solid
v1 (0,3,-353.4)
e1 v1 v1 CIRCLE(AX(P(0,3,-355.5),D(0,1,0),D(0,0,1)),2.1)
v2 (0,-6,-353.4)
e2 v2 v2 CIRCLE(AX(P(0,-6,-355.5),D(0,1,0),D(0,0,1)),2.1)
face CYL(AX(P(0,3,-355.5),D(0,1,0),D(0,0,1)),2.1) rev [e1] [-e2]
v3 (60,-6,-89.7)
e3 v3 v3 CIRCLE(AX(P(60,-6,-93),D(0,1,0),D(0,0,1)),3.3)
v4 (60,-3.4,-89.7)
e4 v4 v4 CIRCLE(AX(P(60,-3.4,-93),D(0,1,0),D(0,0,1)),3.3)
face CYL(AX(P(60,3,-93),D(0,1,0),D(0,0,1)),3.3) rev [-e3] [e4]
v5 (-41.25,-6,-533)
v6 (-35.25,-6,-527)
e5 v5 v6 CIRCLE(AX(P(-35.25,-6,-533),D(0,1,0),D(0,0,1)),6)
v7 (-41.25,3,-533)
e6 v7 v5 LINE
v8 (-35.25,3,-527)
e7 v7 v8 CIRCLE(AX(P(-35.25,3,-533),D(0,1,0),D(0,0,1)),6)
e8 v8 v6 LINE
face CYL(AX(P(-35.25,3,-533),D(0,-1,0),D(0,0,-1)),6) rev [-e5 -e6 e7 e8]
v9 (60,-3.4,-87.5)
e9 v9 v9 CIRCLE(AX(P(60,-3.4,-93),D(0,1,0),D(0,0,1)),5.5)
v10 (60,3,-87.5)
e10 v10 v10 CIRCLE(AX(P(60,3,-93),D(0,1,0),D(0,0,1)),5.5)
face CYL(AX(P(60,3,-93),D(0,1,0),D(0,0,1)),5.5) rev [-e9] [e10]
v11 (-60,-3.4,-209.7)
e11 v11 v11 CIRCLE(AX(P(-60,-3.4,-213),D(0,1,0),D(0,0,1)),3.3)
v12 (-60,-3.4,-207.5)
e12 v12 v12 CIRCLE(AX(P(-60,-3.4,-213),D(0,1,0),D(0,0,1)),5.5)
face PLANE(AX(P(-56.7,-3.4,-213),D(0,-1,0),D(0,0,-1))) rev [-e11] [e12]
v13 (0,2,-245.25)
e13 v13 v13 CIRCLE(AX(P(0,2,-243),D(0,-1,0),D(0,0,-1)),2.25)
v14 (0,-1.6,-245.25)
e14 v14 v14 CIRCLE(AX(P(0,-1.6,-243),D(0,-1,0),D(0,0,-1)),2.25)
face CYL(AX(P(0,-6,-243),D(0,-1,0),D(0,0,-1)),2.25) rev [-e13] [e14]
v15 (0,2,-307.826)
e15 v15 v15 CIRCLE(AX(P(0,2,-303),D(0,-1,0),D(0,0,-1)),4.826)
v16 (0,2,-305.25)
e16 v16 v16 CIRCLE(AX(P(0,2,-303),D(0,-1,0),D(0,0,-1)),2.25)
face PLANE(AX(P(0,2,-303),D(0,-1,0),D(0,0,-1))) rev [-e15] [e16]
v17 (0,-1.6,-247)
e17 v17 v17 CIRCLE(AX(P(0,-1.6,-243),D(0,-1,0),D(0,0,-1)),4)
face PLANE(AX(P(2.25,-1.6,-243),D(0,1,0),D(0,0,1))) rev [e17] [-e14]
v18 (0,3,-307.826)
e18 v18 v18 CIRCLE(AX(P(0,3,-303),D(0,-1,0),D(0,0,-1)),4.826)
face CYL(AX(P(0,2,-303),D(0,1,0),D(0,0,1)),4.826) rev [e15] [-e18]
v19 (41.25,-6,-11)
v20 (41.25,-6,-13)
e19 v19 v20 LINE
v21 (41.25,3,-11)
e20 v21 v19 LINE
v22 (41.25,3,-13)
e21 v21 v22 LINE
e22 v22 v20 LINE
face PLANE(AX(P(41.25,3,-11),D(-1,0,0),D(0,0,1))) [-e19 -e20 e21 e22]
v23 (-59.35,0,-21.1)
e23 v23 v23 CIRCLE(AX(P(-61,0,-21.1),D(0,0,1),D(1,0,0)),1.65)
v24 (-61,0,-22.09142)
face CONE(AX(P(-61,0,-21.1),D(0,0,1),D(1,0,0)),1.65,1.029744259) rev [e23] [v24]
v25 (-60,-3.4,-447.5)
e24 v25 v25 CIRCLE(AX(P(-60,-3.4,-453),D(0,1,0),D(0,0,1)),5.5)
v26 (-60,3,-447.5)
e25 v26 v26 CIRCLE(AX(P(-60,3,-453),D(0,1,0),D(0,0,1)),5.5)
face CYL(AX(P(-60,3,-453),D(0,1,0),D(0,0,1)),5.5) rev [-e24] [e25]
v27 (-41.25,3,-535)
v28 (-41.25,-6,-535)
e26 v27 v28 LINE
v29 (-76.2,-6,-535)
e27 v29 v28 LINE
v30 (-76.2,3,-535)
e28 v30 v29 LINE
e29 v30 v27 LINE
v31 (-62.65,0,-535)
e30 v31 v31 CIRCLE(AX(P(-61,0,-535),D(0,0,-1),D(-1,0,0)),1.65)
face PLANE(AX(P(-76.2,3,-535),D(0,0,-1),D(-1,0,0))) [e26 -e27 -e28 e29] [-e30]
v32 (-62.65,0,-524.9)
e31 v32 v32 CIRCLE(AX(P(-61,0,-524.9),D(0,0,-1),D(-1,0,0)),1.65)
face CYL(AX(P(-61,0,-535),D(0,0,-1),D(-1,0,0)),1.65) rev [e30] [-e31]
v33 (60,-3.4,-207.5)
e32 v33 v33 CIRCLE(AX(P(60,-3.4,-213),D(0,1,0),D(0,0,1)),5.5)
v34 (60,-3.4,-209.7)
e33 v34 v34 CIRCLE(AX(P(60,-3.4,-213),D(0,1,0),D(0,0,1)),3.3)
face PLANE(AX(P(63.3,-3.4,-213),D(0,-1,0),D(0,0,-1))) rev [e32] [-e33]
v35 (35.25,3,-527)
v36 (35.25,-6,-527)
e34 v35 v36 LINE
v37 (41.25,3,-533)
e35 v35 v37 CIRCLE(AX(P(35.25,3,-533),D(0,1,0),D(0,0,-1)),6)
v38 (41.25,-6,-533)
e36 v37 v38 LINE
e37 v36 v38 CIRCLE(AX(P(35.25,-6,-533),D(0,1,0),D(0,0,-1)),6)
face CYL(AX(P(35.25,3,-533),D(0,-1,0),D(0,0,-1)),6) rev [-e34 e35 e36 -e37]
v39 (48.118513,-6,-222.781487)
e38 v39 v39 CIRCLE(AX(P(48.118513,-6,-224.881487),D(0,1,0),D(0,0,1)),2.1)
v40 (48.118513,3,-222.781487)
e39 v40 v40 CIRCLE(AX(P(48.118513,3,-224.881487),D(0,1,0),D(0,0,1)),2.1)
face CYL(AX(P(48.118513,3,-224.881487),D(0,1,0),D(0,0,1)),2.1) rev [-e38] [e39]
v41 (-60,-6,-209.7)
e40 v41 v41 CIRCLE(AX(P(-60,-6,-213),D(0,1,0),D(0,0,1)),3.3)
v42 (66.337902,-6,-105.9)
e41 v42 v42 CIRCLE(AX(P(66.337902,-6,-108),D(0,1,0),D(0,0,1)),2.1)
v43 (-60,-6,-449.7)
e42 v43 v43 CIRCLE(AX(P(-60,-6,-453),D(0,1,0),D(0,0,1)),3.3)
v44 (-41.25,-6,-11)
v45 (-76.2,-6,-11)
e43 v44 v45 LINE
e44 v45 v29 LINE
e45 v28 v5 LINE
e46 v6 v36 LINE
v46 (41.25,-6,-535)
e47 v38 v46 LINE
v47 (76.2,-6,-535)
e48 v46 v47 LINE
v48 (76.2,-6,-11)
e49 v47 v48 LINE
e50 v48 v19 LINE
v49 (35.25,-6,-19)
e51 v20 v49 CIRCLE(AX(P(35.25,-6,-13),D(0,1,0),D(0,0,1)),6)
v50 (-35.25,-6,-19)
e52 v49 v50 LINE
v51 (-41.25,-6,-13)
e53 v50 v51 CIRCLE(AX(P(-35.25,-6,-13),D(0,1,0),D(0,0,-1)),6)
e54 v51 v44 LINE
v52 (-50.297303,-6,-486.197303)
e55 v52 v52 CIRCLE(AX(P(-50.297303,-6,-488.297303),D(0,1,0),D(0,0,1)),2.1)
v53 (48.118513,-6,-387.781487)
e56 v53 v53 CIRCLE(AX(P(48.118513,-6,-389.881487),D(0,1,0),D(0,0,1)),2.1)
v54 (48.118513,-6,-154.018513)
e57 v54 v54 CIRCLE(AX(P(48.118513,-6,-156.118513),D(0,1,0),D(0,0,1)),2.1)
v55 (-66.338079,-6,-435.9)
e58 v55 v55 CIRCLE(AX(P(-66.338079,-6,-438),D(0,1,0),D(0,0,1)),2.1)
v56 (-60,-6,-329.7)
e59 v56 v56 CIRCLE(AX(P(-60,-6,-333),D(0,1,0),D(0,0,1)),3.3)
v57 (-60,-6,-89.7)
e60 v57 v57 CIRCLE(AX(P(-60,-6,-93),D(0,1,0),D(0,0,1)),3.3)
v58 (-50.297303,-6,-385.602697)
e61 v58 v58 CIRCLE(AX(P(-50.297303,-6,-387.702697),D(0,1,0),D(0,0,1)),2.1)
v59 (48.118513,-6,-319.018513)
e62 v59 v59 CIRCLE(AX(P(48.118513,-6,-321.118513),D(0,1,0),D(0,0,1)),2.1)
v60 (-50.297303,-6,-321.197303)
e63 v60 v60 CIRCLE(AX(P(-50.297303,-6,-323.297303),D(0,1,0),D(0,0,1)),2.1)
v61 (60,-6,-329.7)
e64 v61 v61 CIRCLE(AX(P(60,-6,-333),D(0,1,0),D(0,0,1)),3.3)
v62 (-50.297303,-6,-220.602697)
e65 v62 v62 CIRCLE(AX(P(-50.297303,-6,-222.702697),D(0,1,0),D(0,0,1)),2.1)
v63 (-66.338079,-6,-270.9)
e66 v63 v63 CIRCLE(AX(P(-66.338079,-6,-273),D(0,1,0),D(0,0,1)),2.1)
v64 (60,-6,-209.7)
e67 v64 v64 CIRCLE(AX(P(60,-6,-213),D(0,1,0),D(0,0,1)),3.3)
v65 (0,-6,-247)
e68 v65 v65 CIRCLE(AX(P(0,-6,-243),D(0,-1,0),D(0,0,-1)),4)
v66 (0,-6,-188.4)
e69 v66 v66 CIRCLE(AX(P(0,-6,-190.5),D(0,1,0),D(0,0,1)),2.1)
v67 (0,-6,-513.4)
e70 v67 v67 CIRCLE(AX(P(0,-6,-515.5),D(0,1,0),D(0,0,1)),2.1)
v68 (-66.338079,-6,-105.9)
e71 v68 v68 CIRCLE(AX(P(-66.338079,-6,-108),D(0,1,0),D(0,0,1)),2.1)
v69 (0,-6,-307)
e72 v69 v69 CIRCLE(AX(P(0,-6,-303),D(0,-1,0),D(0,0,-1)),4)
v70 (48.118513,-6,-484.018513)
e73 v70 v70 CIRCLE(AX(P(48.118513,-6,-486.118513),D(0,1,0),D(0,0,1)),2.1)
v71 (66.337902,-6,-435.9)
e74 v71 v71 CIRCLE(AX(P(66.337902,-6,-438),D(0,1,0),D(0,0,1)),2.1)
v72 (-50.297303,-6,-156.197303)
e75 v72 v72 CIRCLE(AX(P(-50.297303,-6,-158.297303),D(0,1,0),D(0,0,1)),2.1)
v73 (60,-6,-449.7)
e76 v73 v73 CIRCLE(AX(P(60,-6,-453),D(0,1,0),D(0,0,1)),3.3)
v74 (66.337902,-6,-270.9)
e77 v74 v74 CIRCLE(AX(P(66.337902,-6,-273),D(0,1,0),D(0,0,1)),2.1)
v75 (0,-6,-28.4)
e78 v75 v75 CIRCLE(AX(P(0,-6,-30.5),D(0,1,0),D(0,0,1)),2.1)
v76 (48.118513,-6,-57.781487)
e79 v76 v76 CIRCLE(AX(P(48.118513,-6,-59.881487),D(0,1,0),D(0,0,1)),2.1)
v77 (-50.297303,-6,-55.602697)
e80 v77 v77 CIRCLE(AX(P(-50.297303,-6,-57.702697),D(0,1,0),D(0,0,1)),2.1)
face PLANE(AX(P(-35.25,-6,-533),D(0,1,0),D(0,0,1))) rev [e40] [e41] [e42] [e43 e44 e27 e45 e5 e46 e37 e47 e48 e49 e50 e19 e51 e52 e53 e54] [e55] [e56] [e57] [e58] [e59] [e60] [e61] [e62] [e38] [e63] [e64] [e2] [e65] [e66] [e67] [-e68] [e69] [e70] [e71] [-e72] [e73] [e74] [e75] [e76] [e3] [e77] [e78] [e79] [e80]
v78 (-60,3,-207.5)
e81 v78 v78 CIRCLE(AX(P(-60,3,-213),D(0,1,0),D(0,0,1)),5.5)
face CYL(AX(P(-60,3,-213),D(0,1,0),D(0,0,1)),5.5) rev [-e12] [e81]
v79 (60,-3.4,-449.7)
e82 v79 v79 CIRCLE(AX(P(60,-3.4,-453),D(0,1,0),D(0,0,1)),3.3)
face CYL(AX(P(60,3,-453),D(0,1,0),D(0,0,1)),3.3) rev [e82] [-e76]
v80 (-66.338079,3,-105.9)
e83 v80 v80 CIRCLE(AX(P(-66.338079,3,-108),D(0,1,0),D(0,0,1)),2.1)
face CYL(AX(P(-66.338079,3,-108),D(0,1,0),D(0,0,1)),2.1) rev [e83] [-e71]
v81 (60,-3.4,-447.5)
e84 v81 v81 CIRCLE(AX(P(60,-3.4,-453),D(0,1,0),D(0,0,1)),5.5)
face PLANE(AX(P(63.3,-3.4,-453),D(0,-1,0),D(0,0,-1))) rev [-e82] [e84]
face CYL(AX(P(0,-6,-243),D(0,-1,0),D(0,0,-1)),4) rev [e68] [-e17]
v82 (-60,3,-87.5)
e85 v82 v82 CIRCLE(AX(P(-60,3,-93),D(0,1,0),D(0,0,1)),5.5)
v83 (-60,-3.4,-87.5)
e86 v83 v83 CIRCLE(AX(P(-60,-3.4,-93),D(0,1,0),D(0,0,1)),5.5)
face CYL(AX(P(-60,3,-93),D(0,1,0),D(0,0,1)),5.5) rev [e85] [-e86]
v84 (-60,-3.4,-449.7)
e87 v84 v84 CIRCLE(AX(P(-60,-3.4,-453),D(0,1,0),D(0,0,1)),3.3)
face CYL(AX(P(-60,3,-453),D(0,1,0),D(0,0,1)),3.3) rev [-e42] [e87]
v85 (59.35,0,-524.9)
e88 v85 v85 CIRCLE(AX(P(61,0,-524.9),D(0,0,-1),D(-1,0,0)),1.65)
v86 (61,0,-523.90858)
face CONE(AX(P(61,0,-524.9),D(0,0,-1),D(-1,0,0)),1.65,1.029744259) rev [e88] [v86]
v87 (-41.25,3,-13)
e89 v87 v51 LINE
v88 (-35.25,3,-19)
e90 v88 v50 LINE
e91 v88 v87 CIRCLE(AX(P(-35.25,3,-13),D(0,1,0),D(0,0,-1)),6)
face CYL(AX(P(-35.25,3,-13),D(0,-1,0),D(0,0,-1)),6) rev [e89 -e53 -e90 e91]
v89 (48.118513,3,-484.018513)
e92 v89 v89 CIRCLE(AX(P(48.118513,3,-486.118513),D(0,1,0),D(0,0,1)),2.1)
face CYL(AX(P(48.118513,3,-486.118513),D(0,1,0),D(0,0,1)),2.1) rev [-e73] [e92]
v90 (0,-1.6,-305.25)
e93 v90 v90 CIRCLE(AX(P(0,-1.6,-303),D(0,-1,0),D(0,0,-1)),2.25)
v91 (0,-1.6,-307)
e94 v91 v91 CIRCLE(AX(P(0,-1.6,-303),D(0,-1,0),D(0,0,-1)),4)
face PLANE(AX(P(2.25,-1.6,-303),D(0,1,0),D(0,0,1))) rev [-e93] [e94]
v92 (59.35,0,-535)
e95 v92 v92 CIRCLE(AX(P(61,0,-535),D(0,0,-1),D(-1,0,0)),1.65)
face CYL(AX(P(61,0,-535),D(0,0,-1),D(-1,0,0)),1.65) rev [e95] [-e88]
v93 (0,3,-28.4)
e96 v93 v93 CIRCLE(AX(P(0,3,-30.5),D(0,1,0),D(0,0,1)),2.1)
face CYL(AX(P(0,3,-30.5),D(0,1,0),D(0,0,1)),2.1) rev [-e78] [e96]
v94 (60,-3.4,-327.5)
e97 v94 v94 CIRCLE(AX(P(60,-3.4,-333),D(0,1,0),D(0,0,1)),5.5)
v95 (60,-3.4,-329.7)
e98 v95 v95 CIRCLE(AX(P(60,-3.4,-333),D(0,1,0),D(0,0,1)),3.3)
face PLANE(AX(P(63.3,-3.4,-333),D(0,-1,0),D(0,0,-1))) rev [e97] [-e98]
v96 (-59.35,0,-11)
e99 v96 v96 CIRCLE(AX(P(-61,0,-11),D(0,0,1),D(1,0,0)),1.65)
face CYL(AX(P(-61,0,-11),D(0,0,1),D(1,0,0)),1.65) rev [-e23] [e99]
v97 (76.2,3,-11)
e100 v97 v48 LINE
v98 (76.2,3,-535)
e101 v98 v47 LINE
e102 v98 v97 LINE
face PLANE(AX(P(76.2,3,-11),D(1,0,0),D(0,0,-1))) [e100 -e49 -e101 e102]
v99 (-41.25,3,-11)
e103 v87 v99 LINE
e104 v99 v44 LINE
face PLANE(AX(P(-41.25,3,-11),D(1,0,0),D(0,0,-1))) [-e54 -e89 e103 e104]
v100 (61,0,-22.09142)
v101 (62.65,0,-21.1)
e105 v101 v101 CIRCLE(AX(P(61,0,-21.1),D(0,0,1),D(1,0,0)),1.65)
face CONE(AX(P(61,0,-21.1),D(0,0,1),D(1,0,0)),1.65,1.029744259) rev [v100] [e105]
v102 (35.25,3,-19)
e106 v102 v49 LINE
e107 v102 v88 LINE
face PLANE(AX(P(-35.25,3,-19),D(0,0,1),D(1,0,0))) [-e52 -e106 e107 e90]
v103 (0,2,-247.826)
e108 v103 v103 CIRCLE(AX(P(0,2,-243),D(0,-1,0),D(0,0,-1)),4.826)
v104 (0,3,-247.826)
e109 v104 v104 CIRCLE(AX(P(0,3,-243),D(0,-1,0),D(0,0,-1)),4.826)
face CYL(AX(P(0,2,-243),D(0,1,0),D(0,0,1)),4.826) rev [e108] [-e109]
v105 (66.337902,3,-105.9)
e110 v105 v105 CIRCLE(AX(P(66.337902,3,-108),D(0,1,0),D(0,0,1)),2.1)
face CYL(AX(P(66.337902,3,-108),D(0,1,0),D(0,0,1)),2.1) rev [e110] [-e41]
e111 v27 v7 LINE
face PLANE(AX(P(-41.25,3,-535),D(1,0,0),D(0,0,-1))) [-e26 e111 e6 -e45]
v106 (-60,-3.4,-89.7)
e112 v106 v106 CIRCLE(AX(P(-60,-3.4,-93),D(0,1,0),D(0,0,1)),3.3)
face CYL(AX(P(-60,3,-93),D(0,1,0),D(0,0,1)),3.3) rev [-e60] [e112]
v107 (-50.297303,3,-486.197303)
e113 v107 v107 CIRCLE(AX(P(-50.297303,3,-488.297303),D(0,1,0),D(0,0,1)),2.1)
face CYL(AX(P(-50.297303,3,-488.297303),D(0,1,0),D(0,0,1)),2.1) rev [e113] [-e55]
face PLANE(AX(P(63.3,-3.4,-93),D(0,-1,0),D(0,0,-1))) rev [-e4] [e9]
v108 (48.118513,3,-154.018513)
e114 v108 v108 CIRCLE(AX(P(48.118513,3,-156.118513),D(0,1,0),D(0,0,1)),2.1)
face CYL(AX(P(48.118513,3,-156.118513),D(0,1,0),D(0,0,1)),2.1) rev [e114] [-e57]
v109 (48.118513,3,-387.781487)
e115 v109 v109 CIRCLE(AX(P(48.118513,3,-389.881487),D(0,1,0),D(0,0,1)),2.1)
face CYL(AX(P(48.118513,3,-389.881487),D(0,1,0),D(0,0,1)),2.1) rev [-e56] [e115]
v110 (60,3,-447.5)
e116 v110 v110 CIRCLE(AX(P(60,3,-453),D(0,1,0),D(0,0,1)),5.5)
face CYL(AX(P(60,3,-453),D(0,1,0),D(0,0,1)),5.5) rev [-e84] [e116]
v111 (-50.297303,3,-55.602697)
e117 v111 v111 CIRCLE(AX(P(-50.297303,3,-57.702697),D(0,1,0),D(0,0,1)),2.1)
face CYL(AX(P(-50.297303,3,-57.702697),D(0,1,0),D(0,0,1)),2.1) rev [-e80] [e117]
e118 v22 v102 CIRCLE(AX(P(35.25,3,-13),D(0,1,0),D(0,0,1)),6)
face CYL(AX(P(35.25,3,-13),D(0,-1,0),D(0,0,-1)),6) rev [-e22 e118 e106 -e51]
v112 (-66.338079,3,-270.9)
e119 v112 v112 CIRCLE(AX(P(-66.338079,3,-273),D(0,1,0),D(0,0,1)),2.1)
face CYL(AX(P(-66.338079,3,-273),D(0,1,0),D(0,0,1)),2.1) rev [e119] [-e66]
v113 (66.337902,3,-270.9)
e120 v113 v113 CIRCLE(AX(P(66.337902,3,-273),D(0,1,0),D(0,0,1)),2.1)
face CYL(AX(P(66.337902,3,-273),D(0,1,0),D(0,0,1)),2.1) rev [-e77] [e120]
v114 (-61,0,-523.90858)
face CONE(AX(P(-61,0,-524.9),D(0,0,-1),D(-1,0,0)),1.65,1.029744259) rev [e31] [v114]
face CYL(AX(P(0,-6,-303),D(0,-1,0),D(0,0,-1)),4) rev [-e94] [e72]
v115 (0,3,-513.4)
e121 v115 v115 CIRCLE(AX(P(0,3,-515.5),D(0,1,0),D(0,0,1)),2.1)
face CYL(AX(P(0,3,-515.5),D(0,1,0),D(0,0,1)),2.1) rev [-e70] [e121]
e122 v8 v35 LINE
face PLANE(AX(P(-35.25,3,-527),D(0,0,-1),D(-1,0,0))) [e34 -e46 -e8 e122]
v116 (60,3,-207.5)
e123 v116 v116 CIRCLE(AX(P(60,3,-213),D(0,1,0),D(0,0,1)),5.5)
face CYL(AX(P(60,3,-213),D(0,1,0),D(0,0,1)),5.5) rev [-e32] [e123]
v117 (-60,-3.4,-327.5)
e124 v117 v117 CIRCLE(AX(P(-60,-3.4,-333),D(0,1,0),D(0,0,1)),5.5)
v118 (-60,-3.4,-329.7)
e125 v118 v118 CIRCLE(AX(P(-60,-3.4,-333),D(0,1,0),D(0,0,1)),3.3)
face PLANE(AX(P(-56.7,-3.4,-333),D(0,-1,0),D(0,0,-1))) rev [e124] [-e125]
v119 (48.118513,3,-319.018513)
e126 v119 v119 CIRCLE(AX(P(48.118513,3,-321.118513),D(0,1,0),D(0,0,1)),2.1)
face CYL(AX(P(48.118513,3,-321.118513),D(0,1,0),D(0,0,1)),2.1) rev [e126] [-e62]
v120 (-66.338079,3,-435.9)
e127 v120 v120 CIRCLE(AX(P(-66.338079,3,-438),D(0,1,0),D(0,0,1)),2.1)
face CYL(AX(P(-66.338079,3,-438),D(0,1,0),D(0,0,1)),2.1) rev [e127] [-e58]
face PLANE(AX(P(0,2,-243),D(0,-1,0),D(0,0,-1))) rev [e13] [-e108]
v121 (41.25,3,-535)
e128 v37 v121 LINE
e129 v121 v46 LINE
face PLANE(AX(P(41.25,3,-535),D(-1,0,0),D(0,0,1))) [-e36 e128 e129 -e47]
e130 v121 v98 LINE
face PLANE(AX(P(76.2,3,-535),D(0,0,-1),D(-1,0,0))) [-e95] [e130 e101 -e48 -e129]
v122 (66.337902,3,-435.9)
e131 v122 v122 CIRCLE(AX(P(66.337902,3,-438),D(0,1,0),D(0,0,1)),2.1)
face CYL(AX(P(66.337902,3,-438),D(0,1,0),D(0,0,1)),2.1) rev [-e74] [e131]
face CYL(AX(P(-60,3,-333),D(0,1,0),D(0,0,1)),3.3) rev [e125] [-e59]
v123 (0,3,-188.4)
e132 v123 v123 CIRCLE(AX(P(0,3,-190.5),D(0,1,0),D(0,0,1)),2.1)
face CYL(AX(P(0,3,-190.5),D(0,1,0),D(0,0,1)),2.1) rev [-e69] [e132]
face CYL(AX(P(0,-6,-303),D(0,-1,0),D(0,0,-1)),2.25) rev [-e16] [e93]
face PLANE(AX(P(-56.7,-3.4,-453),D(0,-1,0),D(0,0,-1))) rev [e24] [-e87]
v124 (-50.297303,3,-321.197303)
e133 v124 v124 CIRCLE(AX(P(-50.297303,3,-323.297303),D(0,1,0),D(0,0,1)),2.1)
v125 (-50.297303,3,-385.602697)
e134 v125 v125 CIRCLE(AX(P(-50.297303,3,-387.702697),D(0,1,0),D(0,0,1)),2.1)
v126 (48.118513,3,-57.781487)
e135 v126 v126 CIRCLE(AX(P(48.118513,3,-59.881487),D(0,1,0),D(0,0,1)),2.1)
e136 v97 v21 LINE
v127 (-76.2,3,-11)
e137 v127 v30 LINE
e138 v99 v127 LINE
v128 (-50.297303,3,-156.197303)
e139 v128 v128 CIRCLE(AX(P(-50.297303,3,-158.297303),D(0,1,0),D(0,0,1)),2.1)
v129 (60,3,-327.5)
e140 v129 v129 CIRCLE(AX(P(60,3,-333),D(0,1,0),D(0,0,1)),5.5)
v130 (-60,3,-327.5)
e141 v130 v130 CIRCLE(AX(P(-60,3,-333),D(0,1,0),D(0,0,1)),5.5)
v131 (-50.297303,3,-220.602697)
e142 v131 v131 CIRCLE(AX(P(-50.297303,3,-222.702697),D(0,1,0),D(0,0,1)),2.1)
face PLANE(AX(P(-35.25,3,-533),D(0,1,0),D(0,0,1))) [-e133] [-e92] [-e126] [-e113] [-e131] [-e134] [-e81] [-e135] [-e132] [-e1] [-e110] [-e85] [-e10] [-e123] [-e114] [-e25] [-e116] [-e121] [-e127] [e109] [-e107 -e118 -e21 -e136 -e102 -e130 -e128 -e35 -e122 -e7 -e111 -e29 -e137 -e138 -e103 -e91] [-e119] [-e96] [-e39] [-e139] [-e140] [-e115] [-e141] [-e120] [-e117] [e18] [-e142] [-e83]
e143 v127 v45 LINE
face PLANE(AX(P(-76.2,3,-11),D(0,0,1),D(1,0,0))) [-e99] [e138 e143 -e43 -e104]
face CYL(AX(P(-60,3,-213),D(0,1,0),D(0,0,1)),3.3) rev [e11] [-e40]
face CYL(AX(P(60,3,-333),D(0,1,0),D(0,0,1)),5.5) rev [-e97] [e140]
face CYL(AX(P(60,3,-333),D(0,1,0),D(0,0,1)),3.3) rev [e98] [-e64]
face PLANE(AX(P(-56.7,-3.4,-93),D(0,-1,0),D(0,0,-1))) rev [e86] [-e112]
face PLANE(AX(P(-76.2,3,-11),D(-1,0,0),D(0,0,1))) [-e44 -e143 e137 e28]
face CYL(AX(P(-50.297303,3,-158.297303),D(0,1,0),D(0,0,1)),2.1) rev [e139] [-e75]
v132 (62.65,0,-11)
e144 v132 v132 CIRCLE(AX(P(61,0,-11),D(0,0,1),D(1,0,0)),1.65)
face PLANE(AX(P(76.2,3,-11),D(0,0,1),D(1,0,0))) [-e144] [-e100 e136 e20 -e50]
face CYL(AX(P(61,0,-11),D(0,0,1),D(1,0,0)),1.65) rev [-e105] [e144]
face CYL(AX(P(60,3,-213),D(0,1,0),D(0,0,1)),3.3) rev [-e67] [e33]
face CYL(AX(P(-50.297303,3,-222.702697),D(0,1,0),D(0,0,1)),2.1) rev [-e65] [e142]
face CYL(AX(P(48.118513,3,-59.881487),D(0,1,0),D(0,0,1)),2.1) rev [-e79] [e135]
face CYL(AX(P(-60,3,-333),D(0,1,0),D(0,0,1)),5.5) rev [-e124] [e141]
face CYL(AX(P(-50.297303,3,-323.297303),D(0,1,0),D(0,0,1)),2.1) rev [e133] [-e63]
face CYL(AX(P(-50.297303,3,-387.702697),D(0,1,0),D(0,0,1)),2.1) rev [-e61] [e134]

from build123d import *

# Parameters (mm, degrees)
BOSS_EXTRUDE1_DEPTH                                 = 6
CBORE_FOR_M4_HEX_SOCKET_HEAD_CAP_SCREW1_D           = 4.5
CBORE_FOR_M4_HEX_SOCKET_HEAD_CAP_SCREW1_CBORE_D     = 8
CBORE_FOR_M4_HEX_SOCKET_HEAD_CAP_SCREW1_CBORE_DEPTH = 4.4
CBORE_START                                         = 7.6
CBORE_FOR_M4_HEX_SOCKET_HEAD_CAP_SCR_2_R            = 4
CBORE_FOR_M4_HEX_SOCKET_HEAD_CAP_SCREW2_DEPTH       = 4.4
CBORE_START_2                                       = 1
CBORE_FOR_M4_HEX_SOCKET_HEAD_CAP_SCR_3_O_R          = 2.25
CBORE_FOR_M4_HEX_SOCKET_HEAD_CAP_SCR_3_DEPTH        = 6.6
SKETCH15_W                                          = 81.5
SKETCH15_H                                          = 12
BOSS_EXTRUDE2_DEPTH                                 = 2
M4_TAPPED_HOLE1_D                                   = 3.3
CUT_EXTRUDE1_DEPTH                                  = 70.296464556
CUT_EXTRUDE3_DEPTH                                  = 70.296464574
FILLET1_R                                           = 4
SKETCH16_W                                          = 20
SKETCH16_H                                          = 12
BOSS_EXTRUDE3_DEPTH                                 = 2.75
FILLET2_R                                           = 3.5
M2_TAPPED_HOLE1_D                                   = 1.6
M2_TAPPED_HOLE1_DEPTH                               = 7.2
M2_TAPPED_HOLE1_TIP                                 = 0.480688495
M3_TAPPED_HOLE1_D                                   = 2.5
BOSS_EXTRUDE4_DEPTH                                 = 9
M4_TAPPED_HOLE2_AT_2_COUNT                          = 2
M4_TAPPED_HOLE2_AT_2_PITCH                          = 122
CBORE_FOR_M6_HEX_SOCKET_HEAD_CAP_SCREW1_D           = 6.6
CBORE_FOR_M6_HEX_SOCKET_HEAD_CAP_SCREW1_CBORE_D     = 11
CBORE_FOR_M6_HEX_SOCKET_HEAD_CAP_SCREW1_CBORE_DEPTH = 6.4
SKETCH44_R                                          = 4.826
CUT_EXTRUDE6_DEPTH                                  = 1
CBORE_FOR_M4_HEX_SOCKET_HEAD_CAP_SCREW3_D           = 4.5
CBORE_FOR_M4_HEX_SOCKET_HEAD_CAP_SCREW3_CBORE_D     = 8
CBORE_FOR_M4_HEX_SOCKET_HEAD_CAP_SCREW3_CBORE_DEPTH = 4.4
M5_TAPPED_HOLE1_D                                   = 4.2


# Read off the part's stored shape, not the designer's step: CBORE for M4 Hex Socket Head Cap Screw2
with BuildPart() as part:
    # Sketch2 → Boss-Extrude1 (new, symmetric)
    with BuildSketch(Plane(origin=(0, 0, 0), x_dir=(1, 0, 0), z_dir=(0, 1, 0))):
        with BuildLine():
            Line((67, 11), (67, -10.5))
            ThreePointArc((67, -10.5), (66.560660172, -11.560660172), (65.5, -12))
            Line((65.5, -12), (-65.5, -12))
            ThreePointArc((-65.5, -12), (-66.560660172, -11.560660172), (-67, -10.5))
            Line((-67, -10.5), (-67, 11))
            Line((-67, 11), (0, 11))
            Line((0, 11), (67, 11))
        make_face()
        with BuildLine():
            Line((42.806252715, 3.5), (35.85, 3.5))
            ThreePointArc((35.85, 3.5), (34.435786438, 4.085786438), (33.85, 5.5))
            Line((33.85, 5.5), (33.85, 8.25))
            ThreePointArc((33.85, 8.25), (33.190990258, 9.840990258), (31.6, 10.5))
            Line((31.6, 10.5), (19.6, 10.5))
            ThreePointArc((19.6, 10.5), (17.35, 8.25), (19.6, 6))
            Line((19.6, 6), (27.75, 6))
            ThreePointArc((27.75, 6), (29.164213562, 5.414213562), (29.75, 4))
            Line((29.75, 4), (29.75, 1.25))
            ThreePointArc((29.75, 1.25), (30.409009742, -0.340990258), (32, -1))
            Line((32, -1), (42.062746067, -1))
            ThreePointArc((42.062746067, -1), (57.892990527, -1.304109096), (42.806252715, 3.5))
        make_face(mode=Mode.SUBTRACT)
        with BuildLine():
            Line((-42.062746067, -1), (-32, -1))
            ThreePointArc((-32, -1), (-30.409009742, -0.340990258), (-29.75, 1.25))
            Line((-29.75, 1.25), (-29.75, 4))
            ThreePointArc((-29.75, 4), (-29.164213562, 5.414213562), (-27.75, 6))
            Line((-27.75, 6), (-19.6, 6))
            ThreePointArc((-19.6, 6), (-17.35, 8.25), (-19.6, 10.5))
            Line((-19.6, 10.5), (-31.6, 10.5))
            ThreePointArc((-31.6, 10.5), (-33.190990258, 9.840990258), (-33.85, 8.25))
            Line((-33.85, 8.25), (-33.85, 5.5))
            ThreePointArc((-33.85, 5.5), (-34.435786438, 4.085786438), (-35.85, 3.5))
            Line((-35.85, 3.5), (-42.806252715, 3.5))
            ThreePointArc((-42.806252715, 3.5), (-57.892990527, -1.304109096), (-42.062746067, -1))
        make_face(mode=Mode.SUBTRACT)
    extrude(amount=BOSS_EXTRUDE1_DEPTH, both=True)

    # CBORE for M4 Hex Socket Head Cap Screw1 (through all)
    with Locations(Plane.XY.offset(12)):
        with Locations((61, 0), (-61, 0)):
            CounterBoreHole(CBORE_FOR_M4_HEX_SOCKET_HEAD_CAP_SCREW1_D / 2, CBORE_FOR_M4_HEX_SOCKET_HEAD_CAP_SCREW1_CBORE_D / 2, CBORE_FOR_M4_HEX_SOCKET_HEAD_CAP_SCREW1_CBORE_DEPTH)

    # CBORE for M4 Hex Socket Head Cap Scr 2 → CBORE for M4 Hex Socket Head Cap Screw2 (cut)
    with BuildSketch(Plane.XY.offset(CBORE_START)):
        with Locations((-38, 0)):
            Circle(CBORE_FOR_M4_HEX_SOCKET_HEAD_CAP_SCR_2_R)
        with Locations((38, 0)):
            Circle(CBORE_FOR_M4_HEX_SOCKET_HEAD_CAP_SCR_2_R)
    extrude(amount=CBORE_FOR_M4_HEX_SOCKET_HEAD_CAP_SCREW2_DEPTH, mode=Mode.SUBTRACT)

    # CBORE for M4 Hex Socket Head Cap Scr 3 o → CBORE for M4 Hex Socket Head Cap Scr 3 (cut)
    with BuildSketch(Plane.XY.offset(CBORE_START_2)):
        with Locations((-38, 0)):
            Circle(CBORE_FOR_M4_HEX_SOCKET_HEAD_CAP_SCR_3_O_R)
        with Locations((38, 0)):
            Circle(CBORE_FOR_M4_HEX_SOCKET_HEAD_CAP_SCR_3_O_R)
    extrude(amount=CBORE_FOR_M4_HEX_SOCKET_HEAD_CAP_SCR_3_DEPTH, mode=Mode.SUBTRACT)

    # Sketch15 → Boss-Extrude2 (add)
    with BuildSketch(Plane(origin=(0, 0, -11), x_dir=(-1, 0, 0), z_dir=(0, 0, -1))):
        Rectangle(SKETCH15_W, SKETCH15_H)
    extrude(amount=BOSS_EXTRUDE2_DEPTH)

    # M4 Tapped Hole1 (through all)
    with Locations(Plane.XY.offset(12)):
        with Locations((38, 0), (-38, 0)):
            Hole(M4_TAPPED_HOLE1_D / 2)

    # Sketch12 → Cut-Revolve1 (revolve, cut)
    with BuildSketch(Plane.XY, mode=Mode.PRIVATE) as cut_revolve1_sk:
        Polygon((0, -6), (6.5, -6), (6.5, -2), (5, -2), (5, 1.25), (4, 1.25), (4, 2), (6.5, 2), (6.5, 6), (0, 6), align=None)
    revolve(cut_revolve1_sk.sketch.rotate(Axis((0, 0, 0), (0, 1, 0)), 90), axis=Axis((0, 0, 0), (0, 1, 0)), mode=Mode.SUBTRACT)

    # Sketch13 → Cut-Extrude1 (cut, through all)
    with BuildSketch(Plane(origin=(0, 6, 0), x_dir=(1, 0, 0), z_dir=(0, 1, 0))):
        with BuildLine():
            Line((-30.884585901, -4), (-19.6, -4))
            ThreePointArc((-19.6, -4), (-18.009009742, -3.340990258), (-17.35, -1.75))
            Line((-17.35, -1.75), (-17.35, 8.25))
            ThreePointArc((-17.35, 8.25), (-18.009009742, 6.659009742), (-19.6, 6))
            Line((-19.6, 6), (-27.75, 6))
            ThreePointArc((-27.75, 6), (-29.164213562, 5.414213562), (-29.75, 4))
            Line((-29.75, 4), (-29.75, 1.25))
            ThreePointArc((-29.75, 1.25), (-30.409009742, -0.340990258), (-32, -1))
            Line((-32, -1), (-35.85, -1))
            ThreePointArc((-35.85, -1), (-34.582145215, -1.281076639), (-33.551866671, -2.071637171))
            Line((-33.551866671, -2.071637171), (-32.608185898, -3.196272122))
            ThreePointArc((-32.608185898, -3.196272122), (-31.83547699, -3.789192521), (-30.884585901, -4))
        make_face()
        with BuildLine():
            Line((27.75, 6), (19.6, 6))
            ThreePointArc((19.6, 6), (18.009009742, 6.659009742), (17.35, 8.25))
            Line((17.35, 8.25), (17.35, -1.75))
            ThreePointArc((17.35, -1.75), (18.009009742, -3.340990258), (19.6, -4))
            Line((19.6, -4), (30.884585901, -4))
            ThreePointArc((30.884585901, -4), (31.83547699, -3.789192521), (32.608185898, -3.196272122))
            Line((32.608185898, -3.196272122), (33.551866671, -2.071637171))
            ThreePointArc((33.551866671, -2.071637171), (34.582145215, -1.281076639), (35.85, -1))
            Line((35.85, -1), (32, -1))
            ThreePointArc((32, -1), (30.409009742, -0.340990258), (29.75, 1.25))
            Line((29.75, 1.25), (29.75, 4))
            ThreePointArc((29.75, 4), (29.164213562, 5.414213562), (27.75, 6))
        make_face()
    extrude(amount=-CUT_EXTRUDE1_DEPTH, mode=Mode.SUBTRACT)

    # Sketch20 → Cut-Extrude3 (cut, through all)
    with BuildSketch(Plane(origin=(0, 6, 0), x_dir=(1, 0, 0), z_dir=(0, 1, 0))):
        with BuildLine():
            Line((40.75, 11), (40.75, 13))
            Line((40.75, 13), (47.5, 11))
            Line((47.5, 11), (44.125, 9.051442841))
            ThreePointArc((44.125, 9.051442841), (41.875, 9.051442841), (40.75, 11))
        make_face()
        with BuildLine():
            Line((-47.5, 11), (-40.75, 13))
            Line((-40.75, 13), (-40.75, 11))
            ThreePointArc((-40.75, 11), (-41.875, 9.051442841), (-44.125, 9.051442841))
            Line((-44.125, 9.051442841), (-47.5, 11))
        make_face()
    extrude(amount=-CUT_EXTRUDE3_DEPTH, mode=Mode.SUBTRACT)

    # Fillet1
    fillet1_edges = [part.edges().sort_by_distance(p)[0] for p in [
        (47.5, 0, -11),
        (-47.5, 0, -11),
    ]]
    fillet(fillet1_edges, radius=FILLET1_R)

    # Sketch16 → Boss-Extrude3 (add)
    with BuildSketch(Plane(origin=(0, 0, -13), x_dir=(-1, 0, 0), z_dir=(0, 0, -1))):
        Rectangle(SKETCH16_W, SKETCH16_H)
    extrude(amount=BOSS_EXTRUDE3_DEPTH)

    # Fillet2
    # the kernel refuses this fillet: 3.5 mm, written as the material it adds along each edge
    with BuildSketch(Plane(origin=(-10, 6, -13), x_dir=(-1, 0, 0), z_dir=(0, -1, 0)), Plane(origin=(10, -6, -13), x_dir=(1, 0, 0), z_dir=(0, 1, 0))) as fillet2_piece_1:
        with BuildLine():
            CenterArc((3.418698583, 3.5), FILLET2_R, 192.373625116, 77.626374884)
            Line((0, 2.75), (-0.068373972, 2.735))
            ThreePointArc((-0.068373972, 2.735), (-0.07, 1.375), (-0.07, 0))
            Line((-0.07, 0), (0, -0.07))
            Line((0, -0.07), (3.418698583, -0.07))
            Line((3.418698583, -0.07), (3.418698583, 0))
        make_face()
    extrude(amount=12)

    # M2 Tapped Hole1
    with Locations(Plane(origin=(0, 0, -15.75), x_dir=(-1, 0, 0), z_dir=(0, 0, -1))):
        with Locations((4.765, 0), (-4.765, 0)):
            Hole(M2_TAPPED_HOLE1_D / 2, depth=M2_TAPPED_HOLE1_DEPTH)
            with Locations((0, 0, -(M2_TAPPED_HOLE1_DEPTH + M2_TAPPED_HOLE1_TIP / 2))):  # 118° drill point
                Cone(0, M2_TAPPED_HOLE1_D / 2, M2_TAPPED_HOLE1_TIP, mode=Mode.SUBTRACT)

    # M3 Tapped Hole1 (through all)
    with Locations(Plane(origin=(0, 6, 0), x_dir=(1, 0, 0), z_dir=(0, 1, 0))):
        with Locations((14, 0), (-14, 0)):
            Hole(M3_TAPPED_HOLE1_D / 2)


with BuildPart() as body_2:
    # Sketch26 → Boss-Extrude4 (new body)
    with BuildSketch(Plane.XZ.offset(6)):
        with BuildLine():
            Line((-76.2, -11), (-41.25, -11))
            Line((-41.25, -11), (-41.25, -13))
            ThreePointArc((-41.25, -13), (-39.492640687, -17.242640687), (-35.25, -19))
            Line((-35.25, -19), (35.25, -19))
            ThreePointArc((35.25, -19), (39.492640687, -17.242640687), (41.25, -13))
            Line((41.25, -13), (41.25, -11))
            Line((41.25, -11), (76.2, -11))
            Line((76.2, -11), (76.2, -535))
            Line((76.2, -535), (41.25, -535))
            Line((41.25, -535), (41.25, -533))
            ThreePointArc((41.25, -533), (39.492640687, -528.757359313), (35.25, -527))
            Line((35.25, -527), (-35.25, -527))
            ThreePointArc((-35.25, -527), (-39.492640687, -528.757359313), (-41.25, -533))
            Line((-41.25, -533), (-41.25, -535))
            Line((-41.25, -535), (-76.2, -535))
            Line((-76.2, -535), (-76.2, -11))
        make_face()
    extrude(amount=-BOSS_EXTRUDE4_DEPTH)

    # Sketch29 → M4 Tapped Hole2 (revolve, cut)
    with BuildSketch(Plane(origin=(-61, 0, -11), x_dir=(0, -1, 0), z_dir=(1, 0, 0))):
        Polygon((0, 0), (0, 11.091420021), (1.65, 10.1), (1.65, 0), align=None)
    m4_tapped_hole2 = revolve(axis=Axis((-61, 0, -4.65), (0, 0, -1)), mode=Mode.SUBTRACT)

    # M4 Tapped Hole2 at 2: M4 Tapped Hole2 ×2
    with Locations(*[(i * M4_TAPPED_HOLE2_AT_2_PITCH, 0, 0) for i in range(1, M4_TAPPED_HOLE2_AT_2_COUNT)]):
        add(m4_tapped_hole2, mode=Mode.SUBTRACT)

    # Mirror1: M4 Tapped Hole2 across plane
    add(m4_tapped_hole2.mirror(Plane.XY.offset(-273)), mode=Mode.SUBTRACT)

    # Mirror1 copy 1 sketch → Mirror1 copy 1 (revolve, cut)
    with BuildSketch(Plane(origin=(61, 0, -535), x_dir=(0, -1, 0), z_dir=(1, 0, 0))):
        Polygon((0, 0), (0, -11.091420021), (1.65, -10.1), (1.65, 0), align=None)
    revolve(axis=Axis((61, 0, -541.35), (0, 0, -1)), mode=Mode.SUBTRACT)

    # CBORE for M6 Hex Socket Head Cap Screw1 (through all)
    with Locations(Plane(origin=(0, 3, 0), x_dir=(-1, 0, 0), z_dir=(0, 1, 0))):
        with Locations((-60, -453), (-60, -333), (60, -333), (60, -453), (60, -93), (60, -213), (-60, -213), (-60, -93)):
            CounterBoreHole(CBORE_FOR_M6_HEX_SOCKET_HEAD_CAP_SCREW1_D / 2, CBORE_FOR_M6_HEX_SOCKET_HEAD_CAP_SCREW1_CBORE_D / 2, CBORE_FOR_M6_HEX_SOCKET_HEAD_CAP_SCREW1_CBORE_DEPTH)

    # Sketch44 → Cut-Extrude6 (cut)
    with BuildSketch(Plane.XZ.offset(-3)):
        with Locations(Location((0, -243, 0), (0, 0, 270))):
            Circle(SKETCH44_R)
        with Locations(Location((0, -303, 0), (0, 0, 270))):
            Circle(SKETCH44_R)
    extrude(amount=CUT_EXTRUDE6_DEPTH, mode=Mode.SUBTRACT)

    # CBORE for M4 Hex Socket Head Cap Screw3 (through all)
    with Locations(Plane(origin=(0, -6, 0), x_dir=(-1, 0, 0), z_dir=(0, -1, 0))):
        with Locations((0, 303), (0, 243)):
            CounterBoreHole(CBORE_FOR_M4_HEX_SOCKET_HEAD_CAP_SCREW3_D / 2, CBORE_FOR_M4_HEX_SOCKET_HEAD_CAP_SCREW3_CBORE_D / 2, CBORE_FOR_M4_HEX_SOCKET_HEAD_CAP_SCREW3_CBORE_DEPTH)

    # M5 Tapped Hole1 (through all)
    with Locations(Plane(origin=(0, 3, 0), x_dir=(1, 0, 0), z_dir=(0, 1, 0))):
        with Locations((-66.338078988, 273), (-50.297302762, 323.297302762), (48.11851323, 321.11851323), (66.337901802, 273), (48.11851323, 224.88148677), (0, 190.5), (-50.297302762, 222.702697238), (0, 355.5), (-50.297302762, 387.702697238), (-66.338078988, 438), (-50.297302762, 488.297302762), (0, 515.5), (48.11851323, 486.11851323), (66.337901802, 438), (48.11851323, 389.88148677), (-50.297302762, 57.702697238), (-66.338078988, 108), (-50.297302762, 158.297302762), (48.11851323, 156.11851323), (66.337901802, 108), (48.11851323, 59.88148677), (0, 30.5)):
            Hole(M5_TAPPED_HOLE1_D / 2)


solid = body_2.part
